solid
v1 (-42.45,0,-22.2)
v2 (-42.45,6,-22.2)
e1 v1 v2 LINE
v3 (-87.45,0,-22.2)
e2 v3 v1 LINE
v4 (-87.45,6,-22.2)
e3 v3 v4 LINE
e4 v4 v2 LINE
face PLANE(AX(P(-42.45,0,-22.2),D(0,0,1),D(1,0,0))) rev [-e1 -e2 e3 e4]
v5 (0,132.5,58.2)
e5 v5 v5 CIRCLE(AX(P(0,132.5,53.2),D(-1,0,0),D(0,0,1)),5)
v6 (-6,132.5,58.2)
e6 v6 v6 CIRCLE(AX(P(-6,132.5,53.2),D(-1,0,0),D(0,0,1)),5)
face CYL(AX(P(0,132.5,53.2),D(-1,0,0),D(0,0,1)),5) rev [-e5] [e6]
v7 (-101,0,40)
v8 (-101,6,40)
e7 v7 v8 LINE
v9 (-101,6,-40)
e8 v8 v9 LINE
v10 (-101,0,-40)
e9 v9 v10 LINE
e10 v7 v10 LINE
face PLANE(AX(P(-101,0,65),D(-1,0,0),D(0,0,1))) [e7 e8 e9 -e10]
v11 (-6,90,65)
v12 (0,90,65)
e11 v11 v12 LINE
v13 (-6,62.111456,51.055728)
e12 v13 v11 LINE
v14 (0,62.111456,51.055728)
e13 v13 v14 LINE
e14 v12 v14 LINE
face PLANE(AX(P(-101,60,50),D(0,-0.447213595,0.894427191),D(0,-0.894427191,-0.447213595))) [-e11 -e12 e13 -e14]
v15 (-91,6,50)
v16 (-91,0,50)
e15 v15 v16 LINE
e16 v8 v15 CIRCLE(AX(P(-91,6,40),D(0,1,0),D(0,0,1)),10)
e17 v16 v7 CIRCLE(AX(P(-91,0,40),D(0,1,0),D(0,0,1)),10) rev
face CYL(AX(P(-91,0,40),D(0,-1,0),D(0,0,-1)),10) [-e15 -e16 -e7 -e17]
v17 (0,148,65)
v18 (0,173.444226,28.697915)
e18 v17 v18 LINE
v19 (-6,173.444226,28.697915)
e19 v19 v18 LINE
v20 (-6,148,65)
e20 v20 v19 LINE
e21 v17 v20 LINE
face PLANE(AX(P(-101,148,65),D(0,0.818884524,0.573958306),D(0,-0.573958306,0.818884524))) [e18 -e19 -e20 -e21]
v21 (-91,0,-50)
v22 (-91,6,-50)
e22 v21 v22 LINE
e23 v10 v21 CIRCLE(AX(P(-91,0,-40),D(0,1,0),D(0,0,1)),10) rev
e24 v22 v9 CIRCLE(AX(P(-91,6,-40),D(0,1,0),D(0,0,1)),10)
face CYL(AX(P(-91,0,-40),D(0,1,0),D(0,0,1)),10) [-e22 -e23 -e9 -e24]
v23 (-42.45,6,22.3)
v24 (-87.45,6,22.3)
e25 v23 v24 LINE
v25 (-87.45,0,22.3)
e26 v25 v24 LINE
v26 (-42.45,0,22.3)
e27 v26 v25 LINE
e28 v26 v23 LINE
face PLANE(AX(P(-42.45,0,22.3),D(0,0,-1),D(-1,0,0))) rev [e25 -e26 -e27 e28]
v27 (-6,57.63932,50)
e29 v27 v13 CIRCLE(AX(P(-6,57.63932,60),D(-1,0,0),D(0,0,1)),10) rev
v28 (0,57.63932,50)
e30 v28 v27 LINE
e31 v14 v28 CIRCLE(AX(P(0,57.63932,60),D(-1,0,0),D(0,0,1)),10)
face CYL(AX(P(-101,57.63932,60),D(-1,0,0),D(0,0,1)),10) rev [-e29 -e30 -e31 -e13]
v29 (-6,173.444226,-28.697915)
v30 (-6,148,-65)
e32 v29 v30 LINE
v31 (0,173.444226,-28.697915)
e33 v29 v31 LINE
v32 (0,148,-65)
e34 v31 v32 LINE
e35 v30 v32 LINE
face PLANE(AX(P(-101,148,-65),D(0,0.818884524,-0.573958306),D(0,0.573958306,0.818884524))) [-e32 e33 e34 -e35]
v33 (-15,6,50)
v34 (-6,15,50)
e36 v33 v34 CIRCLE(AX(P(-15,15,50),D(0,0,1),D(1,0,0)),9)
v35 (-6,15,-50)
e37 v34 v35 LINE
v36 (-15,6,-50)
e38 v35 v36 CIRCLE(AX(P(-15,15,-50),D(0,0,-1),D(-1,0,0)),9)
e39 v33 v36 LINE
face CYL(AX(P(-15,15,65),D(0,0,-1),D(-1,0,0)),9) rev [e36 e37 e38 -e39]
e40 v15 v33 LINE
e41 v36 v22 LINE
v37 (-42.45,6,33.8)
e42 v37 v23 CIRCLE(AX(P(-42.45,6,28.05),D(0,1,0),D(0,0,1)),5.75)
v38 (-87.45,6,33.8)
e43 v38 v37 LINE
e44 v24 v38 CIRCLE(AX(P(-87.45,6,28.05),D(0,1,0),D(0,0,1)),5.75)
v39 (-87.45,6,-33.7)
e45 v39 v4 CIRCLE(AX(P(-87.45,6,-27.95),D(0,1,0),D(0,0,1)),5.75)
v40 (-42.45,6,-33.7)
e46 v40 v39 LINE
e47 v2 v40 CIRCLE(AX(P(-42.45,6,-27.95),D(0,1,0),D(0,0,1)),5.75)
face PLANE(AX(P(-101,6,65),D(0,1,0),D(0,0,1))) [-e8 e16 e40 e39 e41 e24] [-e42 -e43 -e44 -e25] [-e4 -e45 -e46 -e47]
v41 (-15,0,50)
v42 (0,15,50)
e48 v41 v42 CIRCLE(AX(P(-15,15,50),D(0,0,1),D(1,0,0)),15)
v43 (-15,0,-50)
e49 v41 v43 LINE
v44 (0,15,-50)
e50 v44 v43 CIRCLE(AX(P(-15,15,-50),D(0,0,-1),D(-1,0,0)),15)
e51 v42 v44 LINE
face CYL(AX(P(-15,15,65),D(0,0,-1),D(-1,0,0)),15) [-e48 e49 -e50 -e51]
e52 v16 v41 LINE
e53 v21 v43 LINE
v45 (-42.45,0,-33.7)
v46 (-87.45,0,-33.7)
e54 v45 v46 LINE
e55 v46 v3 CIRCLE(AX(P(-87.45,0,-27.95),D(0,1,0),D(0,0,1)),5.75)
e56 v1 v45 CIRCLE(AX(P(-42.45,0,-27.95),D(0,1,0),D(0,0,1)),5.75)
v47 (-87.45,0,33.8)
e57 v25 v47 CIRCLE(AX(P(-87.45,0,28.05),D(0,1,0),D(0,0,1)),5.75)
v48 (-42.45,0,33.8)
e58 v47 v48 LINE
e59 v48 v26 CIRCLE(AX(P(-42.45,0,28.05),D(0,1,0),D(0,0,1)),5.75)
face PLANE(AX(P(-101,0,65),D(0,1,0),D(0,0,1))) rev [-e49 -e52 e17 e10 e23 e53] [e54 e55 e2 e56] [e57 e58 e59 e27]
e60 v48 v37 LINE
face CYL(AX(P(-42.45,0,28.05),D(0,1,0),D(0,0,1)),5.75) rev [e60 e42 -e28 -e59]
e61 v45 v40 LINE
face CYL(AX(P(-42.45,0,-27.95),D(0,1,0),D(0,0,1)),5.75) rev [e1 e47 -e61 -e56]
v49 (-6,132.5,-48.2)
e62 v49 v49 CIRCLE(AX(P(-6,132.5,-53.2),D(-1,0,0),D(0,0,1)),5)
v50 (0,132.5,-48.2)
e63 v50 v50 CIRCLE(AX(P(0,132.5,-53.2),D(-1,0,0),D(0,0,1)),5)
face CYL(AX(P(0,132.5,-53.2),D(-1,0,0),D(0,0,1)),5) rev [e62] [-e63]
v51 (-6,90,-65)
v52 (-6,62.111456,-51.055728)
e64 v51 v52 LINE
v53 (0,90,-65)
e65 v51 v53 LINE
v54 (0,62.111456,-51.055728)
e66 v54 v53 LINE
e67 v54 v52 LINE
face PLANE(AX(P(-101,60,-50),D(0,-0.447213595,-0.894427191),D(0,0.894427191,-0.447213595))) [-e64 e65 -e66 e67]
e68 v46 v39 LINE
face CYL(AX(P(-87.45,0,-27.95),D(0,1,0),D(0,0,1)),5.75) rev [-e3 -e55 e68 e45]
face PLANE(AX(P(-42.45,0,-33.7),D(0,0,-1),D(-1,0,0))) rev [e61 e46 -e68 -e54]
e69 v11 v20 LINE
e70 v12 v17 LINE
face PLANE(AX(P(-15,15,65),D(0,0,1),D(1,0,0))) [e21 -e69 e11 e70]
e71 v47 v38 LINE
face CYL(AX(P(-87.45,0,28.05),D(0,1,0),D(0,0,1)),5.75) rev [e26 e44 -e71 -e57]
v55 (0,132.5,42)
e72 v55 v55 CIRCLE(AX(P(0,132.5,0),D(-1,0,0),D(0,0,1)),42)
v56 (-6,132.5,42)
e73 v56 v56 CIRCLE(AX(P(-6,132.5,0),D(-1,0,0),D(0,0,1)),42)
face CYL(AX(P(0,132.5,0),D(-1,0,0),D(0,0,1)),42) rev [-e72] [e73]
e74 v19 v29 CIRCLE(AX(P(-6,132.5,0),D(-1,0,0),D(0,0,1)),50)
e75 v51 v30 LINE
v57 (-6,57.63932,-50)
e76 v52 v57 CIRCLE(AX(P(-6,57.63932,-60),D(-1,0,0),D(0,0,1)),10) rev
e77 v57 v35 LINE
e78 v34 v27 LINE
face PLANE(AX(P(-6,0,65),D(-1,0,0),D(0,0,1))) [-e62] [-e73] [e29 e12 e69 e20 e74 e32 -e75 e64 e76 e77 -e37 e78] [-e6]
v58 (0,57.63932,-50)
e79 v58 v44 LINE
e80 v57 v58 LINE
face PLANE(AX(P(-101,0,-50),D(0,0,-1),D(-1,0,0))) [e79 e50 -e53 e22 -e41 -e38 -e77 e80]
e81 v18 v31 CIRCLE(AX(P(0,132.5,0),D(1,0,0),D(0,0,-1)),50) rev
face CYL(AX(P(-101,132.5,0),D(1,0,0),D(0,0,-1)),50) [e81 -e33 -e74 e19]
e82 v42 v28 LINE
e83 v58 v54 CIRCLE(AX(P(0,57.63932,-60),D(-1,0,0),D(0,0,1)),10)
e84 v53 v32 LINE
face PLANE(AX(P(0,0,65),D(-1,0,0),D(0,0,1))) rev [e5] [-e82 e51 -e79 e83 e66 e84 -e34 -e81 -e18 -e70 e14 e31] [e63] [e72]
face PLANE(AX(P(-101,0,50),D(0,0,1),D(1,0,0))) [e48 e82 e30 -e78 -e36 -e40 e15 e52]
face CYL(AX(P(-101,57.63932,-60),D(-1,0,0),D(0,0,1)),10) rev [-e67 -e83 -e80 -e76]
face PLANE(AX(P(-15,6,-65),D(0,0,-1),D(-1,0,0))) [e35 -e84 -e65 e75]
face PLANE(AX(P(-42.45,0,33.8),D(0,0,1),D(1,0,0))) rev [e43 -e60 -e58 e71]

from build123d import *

# Parameters (mm, degrees)
BASE_FLANGE1_DEPTH      = 65
SKETCH6_R               = 42
SKETCH6_R_2             = 5
CUT_EXTRUDE1_DEPTH      = 10
CUT_EXTRUDE2_DEPTH      = 219.477115506
CUT_EXTRUDE2_DEPTH_BACK = 219.477115506
SKETCH8_OUTSIDE_W       = 181.156
SKETCH8_OUTSIDE_H       = 233.656
CUT_EXTRUDE3_DEPTH      = 10
BREAK_CORNER1_START     = -6
BREAK_CORNER1_DEPTH     = 6
BREAK_CORNER1_2_DEPTH   = 6


# Read off the part's stored shape, not the designer's step: Break-Corner1
# Sheet-metal steps are written as plain solids
with BuildPart() as part:
    # Sketch1 → Base-Flange1 (new, symmetric)
    with BuildSketch(Plane.XY):
        with BuildLine():
            Line((-101, 0), (-15, 0))
            ThreePointArc((-15, 0), (-4.393398282, 4.393398282), (0, 15))
            Line((0, 15), (0, 182.5))
            Line((0, 182.5), (-6, 182.5))
            Line((-6, 182.5), (-6, 15))
            ThreePointArc((-6, 15), (-8.636038969, 8.636038969), (-15, 6))
            Line((-15, 6), (-101, 6))
            Line((-101, 6), (-101, 0))
        make_face()
    extrude(amount=BASE_FLANGE1_DEPTH, both=True)

    # Sketch6 → Cut-Extrude1 (cut)
    with BuildSketch(Plane.ZY.offset(6)):
        with Locations((0, 132.5)):
            Circle(SKETCH6_R)
        with Locations((-53.2, 132.5)):
            Circle(SKETCH6_R_2)
        with Locations((53.2, 132.5)):
            Circle(SKETCH6_R_2)
    extrude(amount=-CUT_EXTRUDE1_DEPTH, mode=Mode.SUBTRACT)

    # Sketch8 outside → Cut-Extrude2 (cut, two sides: drawn at the far end of the back side and taken through both)
    with BuildSketch(Plane(origin=(0, 0, 0), x_dir=(0, 0, -1), z_dir=(1, 0, 0)).offset(-CUT_EXTRUDE2_DEPTH_BACK)):
        with Locations((0, 91.25)):
            Rectangle(SKETCH8_OUTSIDE_W, SKETCH8_OUTSIDE_H)
        with BuildLine():
            Line((50, 0), (50, 60))
            Line((50, 60), (65, 90))
            Line((65, 90), (65, 148))
            Line((65, 148), (28.697915295, 173.444226183))
            ThreePointArc((28.697915295, 173.444226183), (0, 182.5), (-28.697915295, 173.444226183))
            Line((-28.697915295, 173.444226183), (-65, 148))
            Line((-65, 148), (-65, 90))
            Line((-65, 90), (-50, 60))
            Line((-50, 60), (-50, 0))
            Line((-50, 0), (50, 0))
        make_face(mode=Mode.SUBTRACT)
    extrude(amount=CUT_EXTRUDE2_DEPTH + CUT_EXTRUDE2_DEPTH_BACK, mode=Mode.SUBTRACT)

    # Sketch7 → Cut-Extrude3 (cut)
    with BuildSketch(Plane(origin=(0, 6, 0), x_dir=(1, 0, 0), z_dir=(0, 1, 0))):
        with BuildLine():
            Line((-42.45, 22.2), (-87.45, 22.2))
            ThreePointArc((-87.45, 22.2), (-93.2, 27.95), (-87.45, 33.7))
            Line((-87.45, 33.7), (-42.45, 33.7))
            ThreePointArc((-42.45, 33.7), (-36.7, 27.95), (-42.45, 22.2))
        make_face()
        with BuildLine():
            Line((-42.45, -33.8), (-87.45, -33.8))
            ThreePointArc((-87.45, -33.8), (-93.2, -28.05), (-87.45, -22.3))
            Line((-87.45, -22.3), (-42.45, -22.3))
            ThreePointArc((-42.45, -22.3), (-36.7, -28.05), (-42.45, -33.8))
        make_face()
    extrude(amount=-CUT_EXTRUDE3_DEPTH, mode=Mode.SUBTRACT)

    # Break-Corner1 outline → Break-Corner1 (add)
    with BuildSketch(Plane.YZ.offset(BREAK_CORNER1_START)):
        with BuildLine():
            Line((60, 50), (62.11145618, 51.05572809))
            ThreePointArc((62.11145618, 51.05572809), (59.936849431, 50.267510105), (57.639320225, 50))
            Line((57.639320225, 50), (60, 50))
        make_face()
        with BuildLine():
            Line((60, -50), (57.639320225, -50))
            ThreePointArc((57.639320225, -50), (59.936849431, -50.267510105), (62.11145618, -51.05572809))
            Line((62.11145618, -51.05572809), (60, -50))
        make_face()
    extrude(amount=BREAK_CORNER1_DEPTH)

    # Break-Corner1 2 outline → Break-Corner1 2 (cut)
    with BuildSketch(Plane(origin=(0, 0, 0), x_dir=(1, 0, 0), z_dir=(0, 1, 0))):
        with BuildLine():
            Line((-101, -50), (-91, -50))
            ThreePointArc((-91, -50), (-98.071067812, -47.071067812), (-101, -40))
            Line((-101, -40), (-101, -50))
        make_face()
        with BuildLine():
            Line((-101, 50), (-101, 40))
            ThreePointArc((-101, 40), (-98.071067812, 47.071067812), (-91, 50))
            Line((-91, 50), (-101, 50))
        make_face()
    extrude(amount=BREAK_CORNER1_2_DEPTH, mode=Mode.SUBTRACT)


solid = part.part
